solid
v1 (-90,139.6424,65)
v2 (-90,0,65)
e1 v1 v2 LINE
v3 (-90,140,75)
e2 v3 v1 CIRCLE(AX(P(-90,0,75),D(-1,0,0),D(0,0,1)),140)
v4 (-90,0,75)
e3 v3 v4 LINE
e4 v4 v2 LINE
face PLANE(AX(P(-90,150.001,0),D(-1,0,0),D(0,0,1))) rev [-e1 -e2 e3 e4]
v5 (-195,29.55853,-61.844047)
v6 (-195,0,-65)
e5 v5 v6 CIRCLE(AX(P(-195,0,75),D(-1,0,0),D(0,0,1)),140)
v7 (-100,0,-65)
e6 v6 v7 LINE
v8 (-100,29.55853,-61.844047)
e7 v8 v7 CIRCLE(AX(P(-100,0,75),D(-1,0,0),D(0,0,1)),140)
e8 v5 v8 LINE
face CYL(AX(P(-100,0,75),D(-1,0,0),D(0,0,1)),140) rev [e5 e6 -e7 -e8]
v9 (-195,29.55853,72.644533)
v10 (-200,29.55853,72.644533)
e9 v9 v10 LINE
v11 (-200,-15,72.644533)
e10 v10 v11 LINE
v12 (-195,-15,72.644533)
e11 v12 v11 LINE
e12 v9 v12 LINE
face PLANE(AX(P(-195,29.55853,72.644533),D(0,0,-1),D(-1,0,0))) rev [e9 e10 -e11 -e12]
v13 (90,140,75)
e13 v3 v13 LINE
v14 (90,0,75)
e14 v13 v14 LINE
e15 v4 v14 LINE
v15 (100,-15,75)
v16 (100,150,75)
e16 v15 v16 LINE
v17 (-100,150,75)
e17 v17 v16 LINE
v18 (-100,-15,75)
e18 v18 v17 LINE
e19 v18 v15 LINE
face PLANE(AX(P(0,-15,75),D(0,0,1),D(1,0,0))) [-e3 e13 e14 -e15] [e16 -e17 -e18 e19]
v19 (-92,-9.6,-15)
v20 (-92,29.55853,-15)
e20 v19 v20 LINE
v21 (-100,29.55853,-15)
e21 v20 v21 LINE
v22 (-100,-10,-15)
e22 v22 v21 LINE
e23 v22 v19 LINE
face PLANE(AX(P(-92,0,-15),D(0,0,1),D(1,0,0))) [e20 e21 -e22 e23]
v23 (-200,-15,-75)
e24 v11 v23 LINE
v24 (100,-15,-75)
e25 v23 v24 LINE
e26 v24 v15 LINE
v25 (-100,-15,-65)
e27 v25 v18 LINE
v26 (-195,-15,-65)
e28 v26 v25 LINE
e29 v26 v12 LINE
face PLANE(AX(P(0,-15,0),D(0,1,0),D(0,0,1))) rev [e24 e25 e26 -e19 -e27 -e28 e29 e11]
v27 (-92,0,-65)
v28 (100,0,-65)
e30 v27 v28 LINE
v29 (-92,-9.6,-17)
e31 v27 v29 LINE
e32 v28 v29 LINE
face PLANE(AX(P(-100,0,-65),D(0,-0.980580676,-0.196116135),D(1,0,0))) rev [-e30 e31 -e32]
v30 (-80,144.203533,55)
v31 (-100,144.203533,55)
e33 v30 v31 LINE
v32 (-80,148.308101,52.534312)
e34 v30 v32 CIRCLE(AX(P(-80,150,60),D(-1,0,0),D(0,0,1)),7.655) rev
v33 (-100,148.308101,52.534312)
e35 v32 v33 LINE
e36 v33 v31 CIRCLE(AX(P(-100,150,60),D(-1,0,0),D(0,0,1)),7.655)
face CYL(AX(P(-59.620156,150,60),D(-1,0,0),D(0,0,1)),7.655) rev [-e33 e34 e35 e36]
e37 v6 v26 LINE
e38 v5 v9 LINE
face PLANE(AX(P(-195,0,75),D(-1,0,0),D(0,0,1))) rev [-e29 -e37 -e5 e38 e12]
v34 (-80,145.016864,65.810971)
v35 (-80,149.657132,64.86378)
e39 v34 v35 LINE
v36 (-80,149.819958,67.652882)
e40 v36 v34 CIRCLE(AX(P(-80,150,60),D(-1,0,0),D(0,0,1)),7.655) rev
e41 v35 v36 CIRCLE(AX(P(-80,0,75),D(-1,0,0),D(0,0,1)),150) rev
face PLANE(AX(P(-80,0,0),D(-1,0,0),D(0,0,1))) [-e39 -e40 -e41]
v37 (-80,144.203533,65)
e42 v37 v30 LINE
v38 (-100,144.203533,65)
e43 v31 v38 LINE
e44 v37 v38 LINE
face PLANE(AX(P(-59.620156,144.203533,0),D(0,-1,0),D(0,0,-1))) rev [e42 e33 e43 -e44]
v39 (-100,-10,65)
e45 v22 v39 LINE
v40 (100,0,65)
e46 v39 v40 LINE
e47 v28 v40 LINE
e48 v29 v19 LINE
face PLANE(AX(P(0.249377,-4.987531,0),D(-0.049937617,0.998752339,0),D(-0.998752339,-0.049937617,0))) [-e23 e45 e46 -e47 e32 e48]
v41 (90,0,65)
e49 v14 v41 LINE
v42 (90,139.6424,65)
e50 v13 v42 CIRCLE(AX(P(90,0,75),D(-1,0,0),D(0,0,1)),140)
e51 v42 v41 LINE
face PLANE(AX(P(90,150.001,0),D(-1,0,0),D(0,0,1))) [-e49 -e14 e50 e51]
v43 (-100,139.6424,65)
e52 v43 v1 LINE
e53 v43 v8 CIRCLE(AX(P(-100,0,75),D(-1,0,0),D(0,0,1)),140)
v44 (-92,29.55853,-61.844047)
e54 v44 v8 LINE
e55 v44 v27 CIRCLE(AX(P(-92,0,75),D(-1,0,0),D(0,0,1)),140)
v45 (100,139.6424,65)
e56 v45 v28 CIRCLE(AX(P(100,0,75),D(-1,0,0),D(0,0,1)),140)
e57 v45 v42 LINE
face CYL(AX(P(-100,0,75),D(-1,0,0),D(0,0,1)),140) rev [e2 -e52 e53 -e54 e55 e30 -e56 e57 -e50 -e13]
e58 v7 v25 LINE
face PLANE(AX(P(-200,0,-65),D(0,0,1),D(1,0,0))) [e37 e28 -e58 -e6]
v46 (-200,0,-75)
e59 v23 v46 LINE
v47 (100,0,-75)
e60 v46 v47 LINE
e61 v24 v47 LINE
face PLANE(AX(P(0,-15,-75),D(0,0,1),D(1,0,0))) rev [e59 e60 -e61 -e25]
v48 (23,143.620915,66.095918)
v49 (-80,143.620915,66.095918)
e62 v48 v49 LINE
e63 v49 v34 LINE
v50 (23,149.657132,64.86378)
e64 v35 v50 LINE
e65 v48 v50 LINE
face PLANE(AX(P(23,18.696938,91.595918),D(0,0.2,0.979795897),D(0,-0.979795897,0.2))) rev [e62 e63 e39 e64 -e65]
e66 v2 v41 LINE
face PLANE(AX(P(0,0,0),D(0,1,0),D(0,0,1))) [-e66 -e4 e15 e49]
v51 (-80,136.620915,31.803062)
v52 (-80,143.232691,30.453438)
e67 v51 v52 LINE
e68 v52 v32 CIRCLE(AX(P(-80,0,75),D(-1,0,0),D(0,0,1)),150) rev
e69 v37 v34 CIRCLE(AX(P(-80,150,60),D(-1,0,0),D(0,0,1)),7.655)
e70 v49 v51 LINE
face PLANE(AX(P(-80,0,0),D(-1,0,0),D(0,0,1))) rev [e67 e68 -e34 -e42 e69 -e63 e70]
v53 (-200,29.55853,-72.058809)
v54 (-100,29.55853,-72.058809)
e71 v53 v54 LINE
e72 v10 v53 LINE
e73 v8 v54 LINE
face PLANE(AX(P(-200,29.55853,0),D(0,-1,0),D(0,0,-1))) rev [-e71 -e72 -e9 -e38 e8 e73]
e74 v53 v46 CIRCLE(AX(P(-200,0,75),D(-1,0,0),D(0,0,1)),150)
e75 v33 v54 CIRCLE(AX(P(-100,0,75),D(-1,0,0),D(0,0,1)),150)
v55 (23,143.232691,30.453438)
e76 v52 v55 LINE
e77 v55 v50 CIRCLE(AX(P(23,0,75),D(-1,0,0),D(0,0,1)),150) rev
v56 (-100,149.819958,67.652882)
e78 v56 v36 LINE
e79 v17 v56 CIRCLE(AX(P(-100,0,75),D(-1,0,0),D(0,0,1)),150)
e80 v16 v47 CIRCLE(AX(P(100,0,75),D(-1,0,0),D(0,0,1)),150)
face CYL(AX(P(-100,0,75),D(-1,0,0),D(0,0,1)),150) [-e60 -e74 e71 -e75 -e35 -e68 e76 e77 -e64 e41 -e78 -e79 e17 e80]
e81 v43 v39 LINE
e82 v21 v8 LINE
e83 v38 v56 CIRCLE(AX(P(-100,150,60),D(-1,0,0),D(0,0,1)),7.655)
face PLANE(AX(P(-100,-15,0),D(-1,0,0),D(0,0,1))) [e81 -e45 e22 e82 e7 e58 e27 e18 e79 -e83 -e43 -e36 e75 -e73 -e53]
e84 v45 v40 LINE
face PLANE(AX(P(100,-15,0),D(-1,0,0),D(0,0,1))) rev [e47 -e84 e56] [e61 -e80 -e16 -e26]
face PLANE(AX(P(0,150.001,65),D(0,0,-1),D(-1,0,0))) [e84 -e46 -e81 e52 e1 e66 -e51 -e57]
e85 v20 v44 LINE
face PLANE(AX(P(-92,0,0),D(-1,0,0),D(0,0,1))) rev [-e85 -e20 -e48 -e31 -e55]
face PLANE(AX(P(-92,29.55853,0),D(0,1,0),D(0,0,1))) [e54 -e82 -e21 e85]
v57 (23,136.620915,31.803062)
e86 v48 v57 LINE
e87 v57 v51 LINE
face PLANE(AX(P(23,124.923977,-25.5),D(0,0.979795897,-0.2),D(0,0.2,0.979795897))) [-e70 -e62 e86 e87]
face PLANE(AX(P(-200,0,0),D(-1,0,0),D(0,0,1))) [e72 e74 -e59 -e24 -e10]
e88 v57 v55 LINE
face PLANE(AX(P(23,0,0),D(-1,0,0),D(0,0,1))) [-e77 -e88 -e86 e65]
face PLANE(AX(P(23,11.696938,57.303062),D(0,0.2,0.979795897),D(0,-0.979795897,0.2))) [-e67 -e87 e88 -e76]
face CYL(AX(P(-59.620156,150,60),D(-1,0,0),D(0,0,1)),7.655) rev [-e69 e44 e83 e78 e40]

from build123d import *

# Parameters (mm, degrees)
SKETCH1_W                = 200
SKETCH1_H                = 150
BOSS_EXTRUDE1_DEPTH      = 15
SKETCH1_5_W              = 200
SKETCH1_5_H              = 10
REVOLVE1_ANGLE           = 90
BOSS_EXTRUDE3_REACH      = 197.256
BOSS_EXTRUDE3_END_RADIUS = 140
SKETCH1_6_W              = 10
SKETCH1_6_H              = 10
CUT_EXTRUDE2_DEPTH       = 103
CUT_EXTRUDE3_DEPTH       = 20
CUT_LOFT8_START          = -65
CUT_LOFT8_DEPTH          = 130
CUT_LOFT8_START_2        = -100
CUT_LOFT8_2_DEPTH        = 200
BOSS_EXTRUDE5_DEPTH      = 100
BOSS_EXTRUDE6_START      = -8
BOSS_EXTRUDE6_DEPTH      = 8
BOSS_EXTRUDE7_START      = -5
BOSS_EXTRUDE7_DEPTH      = 5


with BuildPart() as part:
    # Sketch1 → Boss-Extrude1 (new body)
    with BuildSketch(Plane(origin=(0, 0, 0), x_dir=(1, 0, 0), z_dir=(0, 1, 0))):
        Rectangle(SKETCH1_W, SKETCH1_H)
    extrude(amount=-BOSS_EXTRUDE1_DEPTH)

    # Sketch1<5> → Revolve1 (revolve)
    with BuildSketch(Plane(origin=(0, 0, 0), x_dir=(1, 0, 0), z_dir=(0, 1, 0))):
        with Locations((0, 70)):
            Rectangle(SKETCH1_5_W, SKETCH1_5_H)
    revolve(axis=Axis((-100, 0, 75), (1, 0, 0)), revolution_arc=REVOLVE1_ANGLE)

    # Boss-Extrude3: up to this cylinder (the profile starts inside it)
    boss_extrude3_end = Plane(origin=(0, 0, 75), z_dir=(-1, 0, 0)) * Cylinder(BOSS_EXTRUDE3_END_RADIUS, 865.512, mode=Mode.PRIVATE)
    # Sketch1<6> → Boss-Extrude3 (add, up to the surface)
    with BuildSketch(Plane(origin=(0, 0, 0), x_dir=(1, 0, 0), z_dir=(0, 1, 0)), mode=Mode.PRIVATE) as boss_extrude3_sk1:
        with Locations((-95, -70)):
            Rectangle(SKETCH1_6_W, SKETCH1_6_H)
    boss_extrude3_tool1 = extrude(boss_extrude3_sk1.sketch, amount=BOSS_EXTRUDE3_REACH, mode=Mode.PRIVATE) & boss_extrude3_end
    add(boss_extrude3_tool1.solids().sort_by_distance((-95, 0, 70))[0])
    # Sketch1<6> → Boss-Extrude3 (add, up to the surface)
    with BuildSketch(Plane(origin=(0, 0, 0), x_dir=(1, 0, 0), z_dir=(0, 1, 0)), mode=Mode.PRIVATE) as boss_extrude3_sk2:
        with Locations((95, -70)):
            Rectangle(SKETCH1_6_W, SKETCH1_6_H)
    boss_extrude3_tool2 = extrude(boss_extrude3_sk2.sketch, amount=BOSS_EXTRUDE3_REACH, mode=Mode.PRIVATE) & boss_extrude3_end
    add(boss_extrude3_tool2.solids().sort_by_distance((95, 0, 70))[0])

    # Sketch5 → Cut-Extrude2 (cut)
    with BuildSketch(Plane.ZY.offset(80)):
        Polygon((66.095917942, 143.620915339), (31.803061543, 136.620915339), (26.803061543, 161.115812766), (61.095917942, 168.115812766), align=None)
    extrude(amount=-CUT_EXTRUDE2_DEPTH, mode=Mode.SUBTRACT)

    # Sketch6 → Cut-Extrude3 (cut)
    with BuildSketch(Plane.ZY.offset(100)):
        with BuildLine():
            Line((55, 144.203533404), (65, 144.203533404))
            ThreePointArc((65, 144.203533404), (60, 157.655), (55, 144.203533404))
        make_face()
    extrude(amount=-CUT_EXTRUDE3_DEPTH, mode=Mode.SUBTRACT)

    # Cut-Loft8: read off the stored shape, not the designer's step
    # Cut-Loft8 outline → Cut-Loft8 (cut)
    with BuildSketch(Plane.XY.offset(CUT_LOFT8_START)):
        Polygon((-100, -10), (100, 0), (-100, 0), align=None)
    extrude(amount=CUT_LOFT8_DEPTH, mode=Mode.SUBTRACT)

    # Cut-Loft8 2 outline → Cut-Loft8 2 (add)
    with BuildSketch(Plane.YZ.offset(CUT_LOFT8_START_2)):
        Polygon((0, -65), (-10.4, -13), (-12, -13), (-12, -65), align=None)
    extrude(amount=CUT_LOFT8_2_DEPTH)

    # Sketch12 → Boss-Extrude5 (add)
    with BuildSketch(Plane.ZY.offset(100)):
        with BuildLine():
            Line((-65, -15), (-65, 0))
            ThreePointArc((-65, 0), (-64.208776017, 14.863266125), (-61.84404743, 29.558529783))
            Line((-61.84404743, 29.558529783), (-72.058809043, 29.558529783))
            ThreePointArc((-72.058809043, 29.558529783), (-74.262891163, 14.852249722), (-75, 0))
            Line((-75, 0), (-75, -15))
            Line((-75, -15), (-65, -15))
        make_face()
    extrude(amount=BOSS_EXTRUDE5_DEPTH)

    # Sketch12<4> → Boss-Extrude6 (add)
    with BuildSketch(Plane.ZY.offset(100).offset(BOSS_EXTRUDE6_START)):
        with BuildLine():
            Line((-65, 0), (-15, -10))
            Line((-15, -10), (-15, 29.558529783))
            Line((-15, 29.558529783), (-61.84404743, 29.558529783))
            ThreePointArc((-61.84404743, 29.558529783), (-64.208776017, 14.863266125), (-65, 0))
        make_face()
    extrude(amount=BOSS_EXTRUDE6_DEPTH)

    # Sketch21 → Boss-Extrude7 (add)
    with BuildSketch(Plane.ZY.offset(200).offset(BOSS_EXTRUDE7_START)):
        with BuildLine():
            Line((-61.84404743, 29.558529783), (72.644533384, 29.558529783))
            Line((72.644533384, 29.558529783), (72.644533384, -15))
            Line((72.644533384, -15), (-65, -15))
            Line((-65, -15), (-65, 0))
            ThreePointArc((-65, 0), (-64.208776017, 14.863266125), (-61.84404743, 29.558529783))
        make_face()
    extrude(amount=BOSS_EXTRUDE7_DEPTH)


solid = part.part
